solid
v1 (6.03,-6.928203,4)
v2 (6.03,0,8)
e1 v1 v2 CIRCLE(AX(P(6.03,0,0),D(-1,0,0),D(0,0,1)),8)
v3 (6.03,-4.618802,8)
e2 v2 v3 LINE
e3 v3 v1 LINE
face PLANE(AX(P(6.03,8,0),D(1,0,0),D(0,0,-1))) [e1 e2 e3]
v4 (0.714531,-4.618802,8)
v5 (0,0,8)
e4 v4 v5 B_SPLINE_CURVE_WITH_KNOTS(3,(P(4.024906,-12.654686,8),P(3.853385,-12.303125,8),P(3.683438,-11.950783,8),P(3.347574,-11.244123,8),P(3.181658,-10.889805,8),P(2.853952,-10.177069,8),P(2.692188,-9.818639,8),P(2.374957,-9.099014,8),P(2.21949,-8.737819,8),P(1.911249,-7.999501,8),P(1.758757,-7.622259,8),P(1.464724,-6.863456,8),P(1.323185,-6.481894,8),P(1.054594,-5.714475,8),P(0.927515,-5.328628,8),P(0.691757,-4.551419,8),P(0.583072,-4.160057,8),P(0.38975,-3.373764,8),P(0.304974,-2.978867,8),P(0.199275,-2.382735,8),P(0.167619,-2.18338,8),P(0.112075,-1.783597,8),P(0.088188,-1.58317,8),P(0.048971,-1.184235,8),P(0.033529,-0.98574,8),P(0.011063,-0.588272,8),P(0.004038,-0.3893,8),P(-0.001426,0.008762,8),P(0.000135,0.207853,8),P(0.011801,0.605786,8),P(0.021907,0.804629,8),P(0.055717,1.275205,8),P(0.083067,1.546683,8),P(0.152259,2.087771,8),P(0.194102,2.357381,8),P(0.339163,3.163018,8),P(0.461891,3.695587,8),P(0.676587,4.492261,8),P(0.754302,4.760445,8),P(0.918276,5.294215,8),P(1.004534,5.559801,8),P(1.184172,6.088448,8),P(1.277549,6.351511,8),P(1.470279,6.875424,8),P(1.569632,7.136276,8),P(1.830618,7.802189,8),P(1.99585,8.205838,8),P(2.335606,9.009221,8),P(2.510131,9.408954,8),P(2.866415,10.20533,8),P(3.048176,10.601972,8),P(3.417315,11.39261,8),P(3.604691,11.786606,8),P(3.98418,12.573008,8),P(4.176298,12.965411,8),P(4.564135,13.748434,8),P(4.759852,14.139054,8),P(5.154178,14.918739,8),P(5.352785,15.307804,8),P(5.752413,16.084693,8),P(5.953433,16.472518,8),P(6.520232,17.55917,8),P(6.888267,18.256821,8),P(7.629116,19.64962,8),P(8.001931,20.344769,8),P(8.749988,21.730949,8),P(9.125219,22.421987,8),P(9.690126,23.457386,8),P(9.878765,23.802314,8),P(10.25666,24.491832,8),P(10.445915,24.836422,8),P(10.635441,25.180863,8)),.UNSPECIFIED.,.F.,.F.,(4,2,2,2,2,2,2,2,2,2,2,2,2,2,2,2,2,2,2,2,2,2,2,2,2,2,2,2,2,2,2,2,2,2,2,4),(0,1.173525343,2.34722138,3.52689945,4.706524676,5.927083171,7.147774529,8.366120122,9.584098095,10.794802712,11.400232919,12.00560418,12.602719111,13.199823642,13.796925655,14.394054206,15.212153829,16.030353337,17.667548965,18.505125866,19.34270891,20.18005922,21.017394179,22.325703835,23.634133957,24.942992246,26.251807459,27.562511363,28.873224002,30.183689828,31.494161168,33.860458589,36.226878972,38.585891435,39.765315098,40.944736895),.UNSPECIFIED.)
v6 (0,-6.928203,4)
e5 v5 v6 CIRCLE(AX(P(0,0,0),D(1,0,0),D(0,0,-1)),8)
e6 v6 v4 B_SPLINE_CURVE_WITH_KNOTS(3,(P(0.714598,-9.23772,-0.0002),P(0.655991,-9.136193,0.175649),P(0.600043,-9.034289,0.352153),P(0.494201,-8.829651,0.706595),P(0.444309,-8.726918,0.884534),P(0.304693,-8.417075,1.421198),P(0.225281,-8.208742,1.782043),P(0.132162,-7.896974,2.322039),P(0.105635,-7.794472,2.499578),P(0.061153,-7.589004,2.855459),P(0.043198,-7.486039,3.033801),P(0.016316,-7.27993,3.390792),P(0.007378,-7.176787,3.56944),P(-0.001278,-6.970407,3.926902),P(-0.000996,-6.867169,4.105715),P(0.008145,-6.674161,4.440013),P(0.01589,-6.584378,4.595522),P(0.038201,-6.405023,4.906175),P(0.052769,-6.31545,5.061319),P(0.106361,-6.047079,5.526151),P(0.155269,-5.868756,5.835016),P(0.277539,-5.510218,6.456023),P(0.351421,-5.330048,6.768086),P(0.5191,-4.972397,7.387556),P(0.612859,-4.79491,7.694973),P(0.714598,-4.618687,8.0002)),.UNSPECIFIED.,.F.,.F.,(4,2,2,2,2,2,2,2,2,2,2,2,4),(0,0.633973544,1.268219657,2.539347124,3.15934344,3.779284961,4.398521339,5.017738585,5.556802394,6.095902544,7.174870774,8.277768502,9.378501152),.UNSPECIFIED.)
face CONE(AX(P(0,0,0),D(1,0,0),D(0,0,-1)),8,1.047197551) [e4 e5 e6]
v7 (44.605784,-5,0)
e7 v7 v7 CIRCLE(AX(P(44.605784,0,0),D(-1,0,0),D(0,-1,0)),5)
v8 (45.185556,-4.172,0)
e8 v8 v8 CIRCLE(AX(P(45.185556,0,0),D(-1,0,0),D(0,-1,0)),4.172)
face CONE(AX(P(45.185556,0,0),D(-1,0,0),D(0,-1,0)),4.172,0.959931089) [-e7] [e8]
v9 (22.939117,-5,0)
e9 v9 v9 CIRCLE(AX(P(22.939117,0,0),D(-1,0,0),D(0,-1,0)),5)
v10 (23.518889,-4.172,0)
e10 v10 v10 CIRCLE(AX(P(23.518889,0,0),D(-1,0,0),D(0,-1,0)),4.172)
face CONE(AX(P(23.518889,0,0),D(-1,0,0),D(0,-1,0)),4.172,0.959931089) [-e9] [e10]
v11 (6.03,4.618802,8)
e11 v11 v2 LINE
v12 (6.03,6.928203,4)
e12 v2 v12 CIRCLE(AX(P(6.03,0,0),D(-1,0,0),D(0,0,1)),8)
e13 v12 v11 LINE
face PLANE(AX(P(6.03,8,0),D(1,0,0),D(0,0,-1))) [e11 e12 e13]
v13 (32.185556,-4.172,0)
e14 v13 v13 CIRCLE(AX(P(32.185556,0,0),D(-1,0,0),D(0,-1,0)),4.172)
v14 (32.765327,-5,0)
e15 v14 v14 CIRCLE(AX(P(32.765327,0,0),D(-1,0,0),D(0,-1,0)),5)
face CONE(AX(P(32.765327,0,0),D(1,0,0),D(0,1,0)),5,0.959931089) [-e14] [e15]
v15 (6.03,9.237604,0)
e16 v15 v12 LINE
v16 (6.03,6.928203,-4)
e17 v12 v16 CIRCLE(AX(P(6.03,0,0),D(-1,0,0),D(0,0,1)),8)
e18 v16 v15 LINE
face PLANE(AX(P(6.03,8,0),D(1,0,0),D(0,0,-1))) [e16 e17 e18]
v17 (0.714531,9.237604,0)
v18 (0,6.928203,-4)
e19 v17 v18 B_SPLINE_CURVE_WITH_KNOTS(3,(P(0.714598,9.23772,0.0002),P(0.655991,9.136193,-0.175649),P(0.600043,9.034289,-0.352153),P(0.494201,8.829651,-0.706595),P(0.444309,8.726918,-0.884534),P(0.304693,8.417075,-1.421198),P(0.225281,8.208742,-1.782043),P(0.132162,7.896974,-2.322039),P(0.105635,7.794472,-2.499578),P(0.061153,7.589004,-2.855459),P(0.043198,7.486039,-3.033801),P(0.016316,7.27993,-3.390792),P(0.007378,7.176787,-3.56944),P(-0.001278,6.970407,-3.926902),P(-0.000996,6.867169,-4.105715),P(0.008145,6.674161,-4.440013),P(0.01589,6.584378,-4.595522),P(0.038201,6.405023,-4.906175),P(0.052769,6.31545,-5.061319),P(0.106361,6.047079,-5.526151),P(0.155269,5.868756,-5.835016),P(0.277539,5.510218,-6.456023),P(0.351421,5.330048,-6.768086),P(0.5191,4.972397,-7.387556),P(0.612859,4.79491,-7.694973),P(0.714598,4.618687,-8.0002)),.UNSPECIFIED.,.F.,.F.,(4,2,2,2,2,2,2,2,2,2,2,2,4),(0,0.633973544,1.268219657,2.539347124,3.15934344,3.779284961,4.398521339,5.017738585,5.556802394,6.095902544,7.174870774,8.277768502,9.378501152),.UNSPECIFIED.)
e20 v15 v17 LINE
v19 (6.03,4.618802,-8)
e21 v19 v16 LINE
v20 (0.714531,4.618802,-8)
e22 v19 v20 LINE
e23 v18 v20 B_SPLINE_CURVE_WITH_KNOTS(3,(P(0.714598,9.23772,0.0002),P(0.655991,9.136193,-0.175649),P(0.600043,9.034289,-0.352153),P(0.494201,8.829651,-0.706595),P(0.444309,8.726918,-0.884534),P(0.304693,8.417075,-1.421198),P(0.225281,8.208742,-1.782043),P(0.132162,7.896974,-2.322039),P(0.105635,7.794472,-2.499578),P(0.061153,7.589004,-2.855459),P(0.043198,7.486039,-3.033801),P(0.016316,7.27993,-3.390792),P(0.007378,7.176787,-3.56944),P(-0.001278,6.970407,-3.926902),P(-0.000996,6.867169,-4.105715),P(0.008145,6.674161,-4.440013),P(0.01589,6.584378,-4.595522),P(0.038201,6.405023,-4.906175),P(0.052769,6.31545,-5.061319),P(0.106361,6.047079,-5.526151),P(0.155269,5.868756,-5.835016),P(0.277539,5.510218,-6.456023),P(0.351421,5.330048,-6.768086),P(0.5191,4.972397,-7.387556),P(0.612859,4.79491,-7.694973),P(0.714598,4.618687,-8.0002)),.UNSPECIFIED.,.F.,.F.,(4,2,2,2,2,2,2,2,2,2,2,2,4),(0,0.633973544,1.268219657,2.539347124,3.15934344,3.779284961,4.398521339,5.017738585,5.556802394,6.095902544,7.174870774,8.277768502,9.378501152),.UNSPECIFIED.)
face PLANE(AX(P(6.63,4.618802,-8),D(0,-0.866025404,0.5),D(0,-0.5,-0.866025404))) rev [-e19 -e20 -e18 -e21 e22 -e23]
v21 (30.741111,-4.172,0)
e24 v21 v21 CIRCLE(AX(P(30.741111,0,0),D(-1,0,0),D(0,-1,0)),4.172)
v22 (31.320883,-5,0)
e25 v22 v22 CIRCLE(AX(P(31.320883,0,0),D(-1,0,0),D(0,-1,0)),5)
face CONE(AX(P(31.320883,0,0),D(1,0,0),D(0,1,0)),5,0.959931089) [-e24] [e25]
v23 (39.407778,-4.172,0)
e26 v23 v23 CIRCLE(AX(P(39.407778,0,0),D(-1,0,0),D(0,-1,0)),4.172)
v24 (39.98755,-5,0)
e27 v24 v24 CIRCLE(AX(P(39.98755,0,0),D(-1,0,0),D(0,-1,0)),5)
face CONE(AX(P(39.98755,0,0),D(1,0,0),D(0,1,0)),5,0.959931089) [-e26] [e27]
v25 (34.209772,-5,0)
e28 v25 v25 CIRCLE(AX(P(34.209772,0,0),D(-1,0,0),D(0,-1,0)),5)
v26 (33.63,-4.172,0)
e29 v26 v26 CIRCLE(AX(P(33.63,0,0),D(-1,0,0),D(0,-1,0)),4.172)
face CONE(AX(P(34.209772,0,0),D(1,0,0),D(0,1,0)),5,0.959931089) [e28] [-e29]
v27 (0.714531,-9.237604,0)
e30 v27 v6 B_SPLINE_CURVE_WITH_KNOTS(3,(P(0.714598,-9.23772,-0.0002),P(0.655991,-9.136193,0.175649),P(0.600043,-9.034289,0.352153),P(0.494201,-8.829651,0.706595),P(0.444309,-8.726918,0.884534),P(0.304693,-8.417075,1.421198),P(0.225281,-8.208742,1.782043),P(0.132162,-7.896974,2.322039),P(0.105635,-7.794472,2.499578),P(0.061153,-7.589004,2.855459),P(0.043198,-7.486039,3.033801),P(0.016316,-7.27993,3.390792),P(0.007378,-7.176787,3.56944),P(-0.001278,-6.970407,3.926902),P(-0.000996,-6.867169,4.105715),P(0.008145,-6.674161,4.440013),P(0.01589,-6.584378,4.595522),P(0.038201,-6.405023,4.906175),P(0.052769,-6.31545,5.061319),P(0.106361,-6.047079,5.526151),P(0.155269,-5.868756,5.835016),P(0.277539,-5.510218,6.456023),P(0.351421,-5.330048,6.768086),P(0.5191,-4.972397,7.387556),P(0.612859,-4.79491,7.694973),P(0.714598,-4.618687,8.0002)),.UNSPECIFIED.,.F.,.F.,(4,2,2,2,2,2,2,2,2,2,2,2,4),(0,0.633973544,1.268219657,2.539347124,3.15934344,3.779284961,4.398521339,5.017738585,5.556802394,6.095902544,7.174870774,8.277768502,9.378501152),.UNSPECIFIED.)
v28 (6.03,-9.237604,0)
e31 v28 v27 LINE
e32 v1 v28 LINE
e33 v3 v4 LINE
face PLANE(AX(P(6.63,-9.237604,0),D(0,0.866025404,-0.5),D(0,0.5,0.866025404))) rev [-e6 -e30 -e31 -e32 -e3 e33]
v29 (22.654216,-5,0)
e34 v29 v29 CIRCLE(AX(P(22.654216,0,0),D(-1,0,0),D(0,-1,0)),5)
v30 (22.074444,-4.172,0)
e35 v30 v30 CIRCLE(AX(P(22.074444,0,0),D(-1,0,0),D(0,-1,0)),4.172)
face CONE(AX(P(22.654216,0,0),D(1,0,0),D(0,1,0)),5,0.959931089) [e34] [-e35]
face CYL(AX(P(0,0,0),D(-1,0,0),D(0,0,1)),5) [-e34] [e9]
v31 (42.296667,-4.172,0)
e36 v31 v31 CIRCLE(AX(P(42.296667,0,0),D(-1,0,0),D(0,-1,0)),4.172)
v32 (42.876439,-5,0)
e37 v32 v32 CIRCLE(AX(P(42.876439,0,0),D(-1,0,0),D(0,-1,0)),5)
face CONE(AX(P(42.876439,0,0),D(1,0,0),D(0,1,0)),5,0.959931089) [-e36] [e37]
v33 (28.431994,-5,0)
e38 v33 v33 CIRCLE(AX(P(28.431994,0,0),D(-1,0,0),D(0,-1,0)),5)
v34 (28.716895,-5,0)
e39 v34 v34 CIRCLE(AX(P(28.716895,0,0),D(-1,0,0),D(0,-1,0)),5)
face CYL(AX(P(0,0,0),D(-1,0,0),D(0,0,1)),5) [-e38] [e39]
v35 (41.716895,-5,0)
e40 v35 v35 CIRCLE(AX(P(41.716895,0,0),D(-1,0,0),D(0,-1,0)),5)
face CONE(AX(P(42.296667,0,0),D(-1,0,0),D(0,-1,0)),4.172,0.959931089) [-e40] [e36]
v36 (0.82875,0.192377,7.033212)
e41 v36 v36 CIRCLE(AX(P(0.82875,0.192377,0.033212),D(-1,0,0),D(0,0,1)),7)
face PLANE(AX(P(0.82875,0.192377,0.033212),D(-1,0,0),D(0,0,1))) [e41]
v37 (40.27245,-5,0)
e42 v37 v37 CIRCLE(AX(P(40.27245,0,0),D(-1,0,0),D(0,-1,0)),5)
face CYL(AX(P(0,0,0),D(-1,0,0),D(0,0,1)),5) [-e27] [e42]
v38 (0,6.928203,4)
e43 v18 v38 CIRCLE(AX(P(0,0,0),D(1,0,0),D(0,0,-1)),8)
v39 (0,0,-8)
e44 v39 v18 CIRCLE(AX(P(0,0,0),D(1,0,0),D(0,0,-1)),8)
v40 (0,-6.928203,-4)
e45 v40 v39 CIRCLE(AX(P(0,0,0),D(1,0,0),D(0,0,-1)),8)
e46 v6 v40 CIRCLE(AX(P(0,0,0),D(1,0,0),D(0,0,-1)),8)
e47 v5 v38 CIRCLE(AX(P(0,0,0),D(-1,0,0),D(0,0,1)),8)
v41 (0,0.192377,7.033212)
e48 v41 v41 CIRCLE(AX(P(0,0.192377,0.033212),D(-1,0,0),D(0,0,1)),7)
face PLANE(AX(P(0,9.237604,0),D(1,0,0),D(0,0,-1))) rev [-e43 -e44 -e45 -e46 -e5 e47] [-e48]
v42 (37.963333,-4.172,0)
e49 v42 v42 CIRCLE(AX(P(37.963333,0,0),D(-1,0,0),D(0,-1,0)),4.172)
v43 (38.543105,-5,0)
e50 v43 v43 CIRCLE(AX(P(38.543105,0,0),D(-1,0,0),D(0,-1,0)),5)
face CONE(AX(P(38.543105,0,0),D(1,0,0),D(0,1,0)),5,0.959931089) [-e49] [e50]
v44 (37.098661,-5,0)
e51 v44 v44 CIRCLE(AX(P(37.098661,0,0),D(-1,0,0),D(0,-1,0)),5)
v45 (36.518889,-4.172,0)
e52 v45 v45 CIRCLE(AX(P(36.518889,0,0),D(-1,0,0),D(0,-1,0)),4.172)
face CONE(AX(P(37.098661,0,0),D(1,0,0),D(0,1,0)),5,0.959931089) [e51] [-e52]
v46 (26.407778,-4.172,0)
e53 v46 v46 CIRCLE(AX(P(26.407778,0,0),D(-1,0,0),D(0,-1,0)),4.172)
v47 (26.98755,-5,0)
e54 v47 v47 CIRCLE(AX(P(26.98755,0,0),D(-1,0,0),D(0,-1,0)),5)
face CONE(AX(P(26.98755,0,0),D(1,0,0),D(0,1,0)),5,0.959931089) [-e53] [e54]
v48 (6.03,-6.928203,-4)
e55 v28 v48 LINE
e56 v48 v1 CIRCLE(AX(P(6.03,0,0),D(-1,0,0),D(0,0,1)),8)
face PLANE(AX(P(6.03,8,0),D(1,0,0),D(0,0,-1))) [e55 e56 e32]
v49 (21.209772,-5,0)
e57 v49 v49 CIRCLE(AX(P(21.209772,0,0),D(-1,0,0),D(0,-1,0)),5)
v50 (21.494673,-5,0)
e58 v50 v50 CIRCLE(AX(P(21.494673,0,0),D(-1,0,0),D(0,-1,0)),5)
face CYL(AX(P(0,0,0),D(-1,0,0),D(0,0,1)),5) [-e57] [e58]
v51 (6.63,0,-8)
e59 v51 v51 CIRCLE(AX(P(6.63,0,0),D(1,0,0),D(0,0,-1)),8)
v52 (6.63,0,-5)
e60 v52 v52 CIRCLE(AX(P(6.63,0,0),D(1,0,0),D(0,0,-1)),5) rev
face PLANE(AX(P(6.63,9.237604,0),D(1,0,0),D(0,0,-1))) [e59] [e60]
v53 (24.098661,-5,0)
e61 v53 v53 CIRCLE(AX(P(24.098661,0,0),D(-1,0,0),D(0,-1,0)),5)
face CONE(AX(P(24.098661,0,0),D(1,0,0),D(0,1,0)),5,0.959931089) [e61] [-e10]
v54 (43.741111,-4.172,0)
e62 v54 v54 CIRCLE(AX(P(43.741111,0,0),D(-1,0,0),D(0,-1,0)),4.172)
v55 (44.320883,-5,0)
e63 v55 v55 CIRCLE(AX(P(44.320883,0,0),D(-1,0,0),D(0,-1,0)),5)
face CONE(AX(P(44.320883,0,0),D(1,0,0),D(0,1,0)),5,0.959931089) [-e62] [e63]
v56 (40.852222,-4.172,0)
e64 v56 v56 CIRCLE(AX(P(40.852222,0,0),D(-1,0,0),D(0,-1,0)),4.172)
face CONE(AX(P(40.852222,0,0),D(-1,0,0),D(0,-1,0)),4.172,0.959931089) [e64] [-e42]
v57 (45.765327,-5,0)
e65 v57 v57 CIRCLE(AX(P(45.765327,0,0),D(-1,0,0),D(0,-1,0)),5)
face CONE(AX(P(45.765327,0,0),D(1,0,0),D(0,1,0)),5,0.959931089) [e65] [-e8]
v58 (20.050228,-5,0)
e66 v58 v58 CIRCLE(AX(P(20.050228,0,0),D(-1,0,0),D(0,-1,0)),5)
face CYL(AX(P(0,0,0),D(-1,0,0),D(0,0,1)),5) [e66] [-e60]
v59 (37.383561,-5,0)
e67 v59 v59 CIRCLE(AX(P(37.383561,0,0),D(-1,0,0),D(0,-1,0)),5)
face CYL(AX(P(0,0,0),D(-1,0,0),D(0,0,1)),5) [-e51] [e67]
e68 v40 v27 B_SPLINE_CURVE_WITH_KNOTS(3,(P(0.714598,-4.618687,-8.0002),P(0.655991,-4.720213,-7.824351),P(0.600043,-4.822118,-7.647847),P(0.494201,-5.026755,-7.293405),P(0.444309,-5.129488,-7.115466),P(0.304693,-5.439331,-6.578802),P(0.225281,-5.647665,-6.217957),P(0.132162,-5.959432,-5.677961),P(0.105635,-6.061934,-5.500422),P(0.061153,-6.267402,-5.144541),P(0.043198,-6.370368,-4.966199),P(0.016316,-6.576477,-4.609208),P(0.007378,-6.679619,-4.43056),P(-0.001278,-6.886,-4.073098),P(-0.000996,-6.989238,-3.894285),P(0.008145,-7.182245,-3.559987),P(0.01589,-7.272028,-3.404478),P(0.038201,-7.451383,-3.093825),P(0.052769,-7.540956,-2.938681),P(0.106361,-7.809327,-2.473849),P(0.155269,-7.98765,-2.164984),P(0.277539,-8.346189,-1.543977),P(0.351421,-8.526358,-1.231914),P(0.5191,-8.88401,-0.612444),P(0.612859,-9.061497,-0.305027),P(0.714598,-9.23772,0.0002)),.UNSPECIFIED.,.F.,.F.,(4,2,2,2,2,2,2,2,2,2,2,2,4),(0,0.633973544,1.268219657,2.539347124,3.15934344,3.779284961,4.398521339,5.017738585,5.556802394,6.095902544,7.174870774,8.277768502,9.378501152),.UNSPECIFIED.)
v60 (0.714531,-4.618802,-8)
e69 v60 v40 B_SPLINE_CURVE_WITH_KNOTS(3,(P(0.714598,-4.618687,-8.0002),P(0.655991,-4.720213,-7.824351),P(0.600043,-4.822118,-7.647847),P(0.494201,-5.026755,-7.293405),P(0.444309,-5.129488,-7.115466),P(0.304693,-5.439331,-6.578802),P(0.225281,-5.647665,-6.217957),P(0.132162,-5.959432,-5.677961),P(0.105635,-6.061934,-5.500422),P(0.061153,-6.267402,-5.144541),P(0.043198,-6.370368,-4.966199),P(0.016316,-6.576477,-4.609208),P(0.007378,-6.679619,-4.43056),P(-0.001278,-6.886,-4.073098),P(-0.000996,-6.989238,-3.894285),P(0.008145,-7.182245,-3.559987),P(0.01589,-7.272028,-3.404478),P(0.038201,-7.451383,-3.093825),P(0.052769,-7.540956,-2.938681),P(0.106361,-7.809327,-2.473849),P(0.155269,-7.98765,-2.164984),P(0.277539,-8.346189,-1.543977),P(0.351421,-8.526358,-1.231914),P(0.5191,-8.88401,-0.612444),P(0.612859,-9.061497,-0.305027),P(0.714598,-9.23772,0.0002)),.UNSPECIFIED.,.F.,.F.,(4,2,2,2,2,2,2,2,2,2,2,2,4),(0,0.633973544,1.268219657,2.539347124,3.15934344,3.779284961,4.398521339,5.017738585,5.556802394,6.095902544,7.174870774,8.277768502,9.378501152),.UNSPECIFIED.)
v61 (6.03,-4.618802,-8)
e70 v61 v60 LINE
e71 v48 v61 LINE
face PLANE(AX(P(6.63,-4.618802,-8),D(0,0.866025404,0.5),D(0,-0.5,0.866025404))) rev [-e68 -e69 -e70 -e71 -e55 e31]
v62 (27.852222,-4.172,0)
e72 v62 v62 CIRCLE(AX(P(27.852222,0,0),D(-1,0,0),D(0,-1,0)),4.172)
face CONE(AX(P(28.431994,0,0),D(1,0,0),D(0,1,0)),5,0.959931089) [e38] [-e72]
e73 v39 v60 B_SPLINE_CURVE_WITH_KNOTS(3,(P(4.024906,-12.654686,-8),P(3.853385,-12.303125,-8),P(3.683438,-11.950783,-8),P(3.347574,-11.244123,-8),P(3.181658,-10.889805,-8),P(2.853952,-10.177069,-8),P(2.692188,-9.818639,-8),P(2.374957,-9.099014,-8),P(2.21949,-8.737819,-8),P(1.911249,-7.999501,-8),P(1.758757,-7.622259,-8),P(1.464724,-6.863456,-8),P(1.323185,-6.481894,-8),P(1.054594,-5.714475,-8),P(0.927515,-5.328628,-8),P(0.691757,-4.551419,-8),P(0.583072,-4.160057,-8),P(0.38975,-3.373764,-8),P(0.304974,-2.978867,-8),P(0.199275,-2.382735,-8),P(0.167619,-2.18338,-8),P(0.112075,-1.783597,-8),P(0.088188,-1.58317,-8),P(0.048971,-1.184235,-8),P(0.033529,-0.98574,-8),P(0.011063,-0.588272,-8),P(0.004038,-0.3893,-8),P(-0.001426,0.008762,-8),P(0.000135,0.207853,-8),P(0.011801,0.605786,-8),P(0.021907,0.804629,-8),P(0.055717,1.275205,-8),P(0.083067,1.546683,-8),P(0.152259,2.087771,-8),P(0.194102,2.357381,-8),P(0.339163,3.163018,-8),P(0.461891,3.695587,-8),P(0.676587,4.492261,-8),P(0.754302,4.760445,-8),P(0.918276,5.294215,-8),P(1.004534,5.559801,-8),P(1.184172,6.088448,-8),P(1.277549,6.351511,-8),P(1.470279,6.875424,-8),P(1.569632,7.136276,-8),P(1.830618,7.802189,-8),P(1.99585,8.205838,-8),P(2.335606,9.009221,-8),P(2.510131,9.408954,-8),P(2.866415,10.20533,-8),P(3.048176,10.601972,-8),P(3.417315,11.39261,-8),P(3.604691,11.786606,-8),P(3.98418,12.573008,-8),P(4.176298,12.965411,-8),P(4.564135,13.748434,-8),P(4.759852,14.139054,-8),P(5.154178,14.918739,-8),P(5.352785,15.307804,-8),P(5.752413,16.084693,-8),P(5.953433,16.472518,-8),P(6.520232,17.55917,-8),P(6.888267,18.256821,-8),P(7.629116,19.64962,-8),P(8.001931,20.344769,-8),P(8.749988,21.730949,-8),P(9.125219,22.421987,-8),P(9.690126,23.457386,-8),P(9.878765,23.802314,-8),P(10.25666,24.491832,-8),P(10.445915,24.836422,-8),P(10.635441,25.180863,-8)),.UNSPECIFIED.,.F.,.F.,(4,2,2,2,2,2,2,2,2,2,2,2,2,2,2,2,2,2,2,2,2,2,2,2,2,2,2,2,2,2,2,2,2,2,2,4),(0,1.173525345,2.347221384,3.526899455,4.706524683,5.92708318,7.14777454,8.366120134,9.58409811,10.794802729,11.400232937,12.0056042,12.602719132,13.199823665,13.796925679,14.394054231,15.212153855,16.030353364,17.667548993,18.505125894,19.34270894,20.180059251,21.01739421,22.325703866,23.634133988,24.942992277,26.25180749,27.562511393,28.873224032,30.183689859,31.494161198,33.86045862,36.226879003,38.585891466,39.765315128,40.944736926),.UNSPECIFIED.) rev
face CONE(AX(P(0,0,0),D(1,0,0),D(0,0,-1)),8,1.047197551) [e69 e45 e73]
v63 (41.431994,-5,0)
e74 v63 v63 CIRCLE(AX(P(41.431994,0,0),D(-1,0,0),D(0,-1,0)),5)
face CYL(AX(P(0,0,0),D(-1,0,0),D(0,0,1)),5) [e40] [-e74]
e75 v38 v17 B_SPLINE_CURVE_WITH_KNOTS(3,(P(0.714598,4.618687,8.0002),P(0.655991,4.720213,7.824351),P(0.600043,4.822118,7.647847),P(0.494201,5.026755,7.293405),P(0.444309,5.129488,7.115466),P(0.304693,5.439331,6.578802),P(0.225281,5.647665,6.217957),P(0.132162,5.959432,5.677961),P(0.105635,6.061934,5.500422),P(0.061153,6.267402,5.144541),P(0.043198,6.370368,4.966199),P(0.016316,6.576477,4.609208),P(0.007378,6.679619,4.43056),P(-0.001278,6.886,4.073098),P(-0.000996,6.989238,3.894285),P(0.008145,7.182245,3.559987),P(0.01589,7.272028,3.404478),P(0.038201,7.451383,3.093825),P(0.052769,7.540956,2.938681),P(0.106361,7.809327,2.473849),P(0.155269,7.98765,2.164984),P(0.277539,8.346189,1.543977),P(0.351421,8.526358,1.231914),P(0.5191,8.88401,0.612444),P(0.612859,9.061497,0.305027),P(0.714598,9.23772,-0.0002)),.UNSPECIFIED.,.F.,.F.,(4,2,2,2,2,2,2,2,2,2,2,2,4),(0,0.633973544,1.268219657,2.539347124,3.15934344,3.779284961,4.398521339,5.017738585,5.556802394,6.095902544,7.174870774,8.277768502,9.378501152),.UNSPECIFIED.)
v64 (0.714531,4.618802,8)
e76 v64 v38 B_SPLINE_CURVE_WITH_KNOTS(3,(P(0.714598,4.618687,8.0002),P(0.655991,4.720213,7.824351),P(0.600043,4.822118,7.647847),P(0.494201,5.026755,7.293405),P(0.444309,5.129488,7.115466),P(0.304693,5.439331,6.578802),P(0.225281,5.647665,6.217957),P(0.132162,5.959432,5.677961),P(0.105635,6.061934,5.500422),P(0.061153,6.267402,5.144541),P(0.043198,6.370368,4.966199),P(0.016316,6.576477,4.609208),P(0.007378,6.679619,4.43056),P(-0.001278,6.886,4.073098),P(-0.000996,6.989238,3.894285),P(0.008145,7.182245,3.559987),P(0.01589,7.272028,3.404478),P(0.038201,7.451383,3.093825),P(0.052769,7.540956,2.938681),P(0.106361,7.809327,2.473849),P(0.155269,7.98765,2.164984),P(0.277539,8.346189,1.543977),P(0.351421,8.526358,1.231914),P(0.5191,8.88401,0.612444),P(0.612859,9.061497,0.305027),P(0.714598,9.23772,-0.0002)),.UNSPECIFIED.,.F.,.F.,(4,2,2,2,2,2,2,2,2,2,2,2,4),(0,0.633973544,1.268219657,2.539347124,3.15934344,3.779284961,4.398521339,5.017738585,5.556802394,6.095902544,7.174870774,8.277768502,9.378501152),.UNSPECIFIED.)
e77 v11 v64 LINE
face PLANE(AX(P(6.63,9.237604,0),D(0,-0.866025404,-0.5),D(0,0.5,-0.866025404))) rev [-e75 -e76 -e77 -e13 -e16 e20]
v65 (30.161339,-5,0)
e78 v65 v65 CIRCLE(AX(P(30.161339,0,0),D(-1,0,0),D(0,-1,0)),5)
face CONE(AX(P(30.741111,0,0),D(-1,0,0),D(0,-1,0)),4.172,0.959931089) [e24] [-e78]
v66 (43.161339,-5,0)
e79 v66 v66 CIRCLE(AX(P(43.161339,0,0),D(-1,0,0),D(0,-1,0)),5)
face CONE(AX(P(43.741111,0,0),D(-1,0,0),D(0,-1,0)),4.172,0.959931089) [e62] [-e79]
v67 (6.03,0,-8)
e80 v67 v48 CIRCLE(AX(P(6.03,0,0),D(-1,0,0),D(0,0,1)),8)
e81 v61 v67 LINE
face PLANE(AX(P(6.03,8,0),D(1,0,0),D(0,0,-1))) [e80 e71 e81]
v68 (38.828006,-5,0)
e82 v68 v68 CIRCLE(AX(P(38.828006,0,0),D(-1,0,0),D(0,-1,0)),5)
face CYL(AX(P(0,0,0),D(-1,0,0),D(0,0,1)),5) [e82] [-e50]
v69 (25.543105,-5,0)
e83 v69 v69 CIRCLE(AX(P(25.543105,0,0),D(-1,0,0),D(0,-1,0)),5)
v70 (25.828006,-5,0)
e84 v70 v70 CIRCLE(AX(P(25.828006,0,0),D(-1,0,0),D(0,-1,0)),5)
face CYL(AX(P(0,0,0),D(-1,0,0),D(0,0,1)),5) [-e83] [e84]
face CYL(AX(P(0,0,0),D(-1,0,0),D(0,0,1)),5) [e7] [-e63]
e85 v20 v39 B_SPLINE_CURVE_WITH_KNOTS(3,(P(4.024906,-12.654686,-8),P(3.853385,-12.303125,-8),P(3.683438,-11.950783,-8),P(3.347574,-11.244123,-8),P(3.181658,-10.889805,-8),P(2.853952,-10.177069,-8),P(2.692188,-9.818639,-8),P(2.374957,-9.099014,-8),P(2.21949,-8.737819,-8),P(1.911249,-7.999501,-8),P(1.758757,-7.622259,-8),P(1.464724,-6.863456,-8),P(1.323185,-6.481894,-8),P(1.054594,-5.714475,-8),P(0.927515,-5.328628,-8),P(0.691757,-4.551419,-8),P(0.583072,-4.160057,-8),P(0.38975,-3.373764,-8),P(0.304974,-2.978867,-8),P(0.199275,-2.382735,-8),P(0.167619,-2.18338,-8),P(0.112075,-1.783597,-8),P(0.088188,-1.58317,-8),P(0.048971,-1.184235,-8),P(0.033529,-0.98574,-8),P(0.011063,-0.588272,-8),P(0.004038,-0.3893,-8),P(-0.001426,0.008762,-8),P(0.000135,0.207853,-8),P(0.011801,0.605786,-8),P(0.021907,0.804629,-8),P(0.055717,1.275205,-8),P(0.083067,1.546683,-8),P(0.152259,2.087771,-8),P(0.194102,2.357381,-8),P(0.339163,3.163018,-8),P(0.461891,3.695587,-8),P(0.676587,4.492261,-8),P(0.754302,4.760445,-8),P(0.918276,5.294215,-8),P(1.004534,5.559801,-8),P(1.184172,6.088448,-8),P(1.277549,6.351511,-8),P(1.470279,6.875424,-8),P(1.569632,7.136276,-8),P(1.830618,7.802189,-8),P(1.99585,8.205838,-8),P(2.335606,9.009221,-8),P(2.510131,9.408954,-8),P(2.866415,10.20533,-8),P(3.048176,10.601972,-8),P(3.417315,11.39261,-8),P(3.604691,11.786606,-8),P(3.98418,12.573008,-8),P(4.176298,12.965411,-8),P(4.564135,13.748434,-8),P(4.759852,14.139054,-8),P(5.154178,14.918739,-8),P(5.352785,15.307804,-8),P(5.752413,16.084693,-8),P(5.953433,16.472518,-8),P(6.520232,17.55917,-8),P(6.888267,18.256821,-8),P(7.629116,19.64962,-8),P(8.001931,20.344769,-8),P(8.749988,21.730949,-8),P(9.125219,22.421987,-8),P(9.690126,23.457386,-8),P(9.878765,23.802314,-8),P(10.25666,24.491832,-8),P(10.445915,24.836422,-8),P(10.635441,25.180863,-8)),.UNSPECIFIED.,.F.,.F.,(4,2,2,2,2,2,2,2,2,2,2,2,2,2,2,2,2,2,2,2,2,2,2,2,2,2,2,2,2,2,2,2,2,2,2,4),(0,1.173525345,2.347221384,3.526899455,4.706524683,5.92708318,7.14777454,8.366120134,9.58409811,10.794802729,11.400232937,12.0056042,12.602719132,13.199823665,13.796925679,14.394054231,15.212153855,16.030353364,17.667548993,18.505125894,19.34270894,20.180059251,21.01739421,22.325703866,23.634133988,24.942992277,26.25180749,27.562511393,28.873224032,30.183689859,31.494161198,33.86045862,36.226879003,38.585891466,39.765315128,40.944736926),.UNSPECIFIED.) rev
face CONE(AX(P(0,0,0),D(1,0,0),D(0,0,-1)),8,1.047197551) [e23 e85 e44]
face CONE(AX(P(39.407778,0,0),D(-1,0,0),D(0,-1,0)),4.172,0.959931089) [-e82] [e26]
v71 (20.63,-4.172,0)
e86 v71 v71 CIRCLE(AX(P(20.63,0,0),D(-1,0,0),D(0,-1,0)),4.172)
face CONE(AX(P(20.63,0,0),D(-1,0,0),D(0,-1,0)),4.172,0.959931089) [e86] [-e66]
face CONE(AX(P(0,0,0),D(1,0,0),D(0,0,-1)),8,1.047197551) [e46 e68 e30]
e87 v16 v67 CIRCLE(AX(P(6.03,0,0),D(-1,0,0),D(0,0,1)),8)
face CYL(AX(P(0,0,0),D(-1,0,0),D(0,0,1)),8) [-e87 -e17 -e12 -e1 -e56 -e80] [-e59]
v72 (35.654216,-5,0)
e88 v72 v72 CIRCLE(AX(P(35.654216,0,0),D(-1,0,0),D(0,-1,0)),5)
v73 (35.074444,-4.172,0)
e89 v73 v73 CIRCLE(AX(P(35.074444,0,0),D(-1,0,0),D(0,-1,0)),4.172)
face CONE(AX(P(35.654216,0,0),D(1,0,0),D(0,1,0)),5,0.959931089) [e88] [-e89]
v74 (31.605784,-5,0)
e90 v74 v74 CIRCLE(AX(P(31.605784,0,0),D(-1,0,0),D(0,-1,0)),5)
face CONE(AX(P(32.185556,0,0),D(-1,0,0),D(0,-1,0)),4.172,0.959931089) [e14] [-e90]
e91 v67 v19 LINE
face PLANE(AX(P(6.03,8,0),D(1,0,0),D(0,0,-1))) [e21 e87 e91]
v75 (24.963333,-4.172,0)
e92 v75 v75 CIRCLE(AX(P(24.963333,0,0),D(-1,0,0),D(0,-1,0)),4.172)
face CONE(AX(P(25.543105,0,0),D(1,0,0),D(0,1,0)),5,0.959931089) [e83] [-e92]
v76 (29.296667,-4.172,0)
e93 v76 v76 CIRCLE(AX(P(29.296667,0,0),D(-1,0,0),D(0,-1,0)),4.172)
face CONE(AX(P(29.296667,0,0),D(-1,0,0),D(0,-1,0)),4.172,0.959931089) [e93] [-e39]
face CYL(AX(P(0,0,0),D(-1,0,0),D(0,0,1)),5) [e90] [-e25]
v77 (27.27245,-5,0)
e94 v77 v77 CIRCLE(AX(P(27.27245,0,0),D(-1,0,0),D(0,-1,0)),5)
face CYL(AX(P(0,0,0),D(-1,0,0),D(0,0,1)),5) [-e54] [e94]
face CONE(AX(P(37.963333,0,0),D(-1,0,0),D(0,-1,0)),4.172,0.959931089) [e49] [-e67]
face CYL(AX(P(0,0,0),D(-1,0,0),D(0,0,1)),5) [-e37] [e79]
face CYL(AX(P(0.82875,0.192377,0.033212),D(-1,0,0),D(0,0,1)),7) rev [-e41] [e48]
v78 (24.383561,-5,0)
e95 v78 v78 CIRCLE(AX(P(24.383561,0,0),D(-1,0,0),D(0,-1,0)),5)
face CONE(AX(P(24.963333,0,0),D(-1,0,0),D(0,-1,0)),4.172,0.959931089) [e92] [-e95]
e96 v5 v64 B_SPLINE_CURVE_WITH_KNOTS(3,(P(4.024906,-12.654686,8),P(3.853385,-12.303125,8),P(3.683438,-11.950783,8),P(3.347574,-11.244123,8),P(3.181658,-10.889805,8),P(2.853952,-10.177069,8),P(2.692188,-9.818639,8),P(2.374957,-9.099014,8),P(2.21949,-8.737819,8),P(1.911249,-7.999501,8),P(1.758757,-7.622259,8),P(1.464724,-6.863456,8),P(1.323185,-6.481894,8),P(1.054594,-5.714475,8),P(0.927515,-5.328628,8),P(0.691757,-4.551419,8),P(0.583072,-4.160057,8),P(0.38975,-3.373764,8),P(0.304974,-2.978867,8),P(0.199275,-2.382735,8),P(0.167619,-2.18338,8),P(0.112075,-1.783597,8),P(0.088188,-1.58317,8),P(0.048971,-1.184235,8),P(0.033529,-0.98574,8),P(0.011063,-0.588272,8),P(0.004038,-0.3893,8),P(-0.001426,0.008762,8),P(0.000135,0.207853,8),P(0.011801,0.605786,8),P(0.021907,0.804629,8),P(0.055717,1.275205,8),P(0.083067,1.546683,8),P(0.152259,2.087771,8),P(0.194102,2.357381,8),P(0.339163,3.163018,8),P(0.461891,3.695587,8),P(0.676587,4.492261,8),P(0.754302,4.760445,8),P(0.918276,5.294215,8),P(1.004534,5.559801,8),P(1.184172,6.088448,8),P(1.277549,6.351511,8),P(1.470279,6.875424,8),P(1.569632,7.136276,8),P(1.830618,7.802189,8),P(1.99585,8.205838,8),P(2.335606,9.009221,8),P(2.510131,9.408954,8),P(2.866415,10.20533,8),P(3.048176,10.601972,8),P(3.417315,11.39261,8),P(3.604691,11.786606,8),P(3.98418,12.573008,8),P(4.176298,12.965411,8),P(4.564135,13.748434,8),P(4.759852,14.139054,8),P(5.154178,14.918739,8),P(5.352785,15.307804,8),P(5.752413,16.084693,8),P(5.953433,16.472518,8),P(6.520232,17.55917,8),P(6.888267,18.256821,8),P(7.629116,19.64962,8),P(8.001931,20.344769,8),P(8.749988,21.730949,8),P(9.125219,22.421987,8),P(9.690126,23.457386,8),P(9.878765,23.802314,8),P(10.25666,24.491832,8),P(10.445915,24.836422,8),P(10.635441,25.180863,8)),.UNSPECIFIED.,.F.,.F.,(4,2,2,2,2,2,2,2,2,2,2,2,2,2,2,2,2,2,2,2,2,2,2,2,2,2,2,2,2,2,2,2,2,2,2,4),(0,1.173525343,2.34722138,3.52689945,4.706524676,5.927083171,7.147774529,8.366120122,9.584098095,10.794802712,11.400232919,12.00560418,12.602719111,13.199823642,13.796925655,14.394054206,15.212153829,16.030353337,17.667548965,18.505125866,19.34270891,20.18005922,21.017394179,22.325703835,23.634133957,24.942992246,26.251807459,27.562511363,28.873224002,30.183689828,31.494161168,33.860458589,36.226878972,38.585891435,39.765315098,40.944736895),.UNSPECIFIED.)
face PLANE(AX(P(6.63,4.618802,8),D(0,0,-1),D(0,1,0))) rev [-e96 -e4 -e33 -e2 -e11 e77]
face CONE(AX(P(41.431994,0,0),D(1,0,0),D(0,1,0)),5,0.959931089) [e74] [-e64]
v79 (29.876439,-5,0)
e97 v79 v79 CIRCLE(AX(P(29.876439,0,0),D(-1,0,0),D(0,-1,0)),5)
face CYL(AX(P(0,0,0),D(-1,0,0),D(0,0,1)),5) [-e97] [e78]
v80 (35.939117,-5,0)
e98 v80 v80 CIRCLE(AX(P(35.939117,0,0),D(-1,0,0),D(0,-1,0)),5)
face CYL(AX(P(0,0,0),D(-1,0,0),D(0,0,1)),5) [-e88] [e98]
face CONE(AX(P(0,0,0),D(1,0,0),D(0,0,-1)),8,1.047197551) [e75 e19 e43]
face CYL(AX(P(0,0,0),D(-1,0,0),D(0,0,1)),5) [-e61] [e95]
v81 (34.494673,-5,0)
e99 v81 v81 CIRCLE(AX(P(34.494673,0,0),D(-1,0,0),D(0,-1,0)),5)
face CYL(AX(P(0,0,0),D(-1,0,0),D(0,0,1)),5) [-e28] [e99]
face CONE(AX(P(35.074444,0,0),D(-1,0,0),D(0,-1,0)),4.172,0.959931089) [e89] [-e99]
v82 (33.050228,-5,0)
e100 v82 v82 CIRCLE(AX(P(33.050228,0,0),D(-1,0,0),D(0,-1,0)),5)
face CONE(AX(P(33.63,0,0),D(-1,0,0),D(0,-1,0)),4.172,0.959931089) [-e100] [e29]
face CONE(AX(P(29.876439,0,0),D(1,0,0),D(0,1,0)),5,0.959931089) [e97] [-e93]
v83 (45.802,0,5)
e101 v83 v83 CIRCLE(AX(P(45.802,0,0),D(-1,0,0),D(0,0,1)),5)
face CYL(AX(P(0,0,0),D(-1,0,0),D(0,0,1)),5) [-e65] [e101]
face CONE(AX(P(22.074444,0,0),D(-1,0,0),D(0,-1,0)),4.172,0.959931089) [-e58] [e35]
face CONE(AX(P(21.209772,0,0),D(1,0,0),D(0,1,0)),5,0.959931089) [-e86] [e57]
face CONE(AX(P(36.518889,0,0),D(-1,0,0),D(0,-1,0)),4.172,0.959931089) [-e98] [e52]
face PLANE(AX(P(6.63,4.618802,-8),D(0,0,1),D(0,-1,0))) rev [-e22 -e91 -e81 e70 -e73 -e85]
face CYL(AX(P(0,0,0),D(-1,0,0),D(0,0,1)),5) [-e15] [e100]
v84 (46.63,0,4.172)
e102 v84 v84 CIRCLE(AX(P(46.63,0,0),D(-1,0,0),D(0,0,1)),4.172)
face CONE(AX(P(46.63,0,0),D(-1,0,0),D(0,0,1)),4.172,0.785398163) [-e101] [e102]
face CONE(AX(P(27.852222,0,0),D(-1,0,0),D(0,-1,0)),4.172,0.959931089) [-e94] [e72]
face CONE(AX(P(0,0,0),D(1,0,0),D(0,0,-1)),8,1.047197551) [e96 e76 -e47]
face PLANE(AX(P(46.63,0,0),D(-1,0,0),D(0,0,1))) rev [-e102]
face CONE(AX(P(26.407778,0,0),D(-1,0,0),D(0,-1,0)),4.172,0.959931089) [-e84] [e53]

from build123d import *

# Parameters (mm, degrees)
BASEHEAD_DEPTH     = 6.63
INDENT_START       = -0.82875
INDENT_2_OUTLINE_R = 7
INDENT_2_DEPTH     = 0.82875
SKETCH4_W          = 0.6
SKETCH4_H          = 11.237604307
THDSCHPAT_COUNT    = 18
THDSCHPAT_PITCH    = 1.444444444


# Read off the part's stored shape, not the designer's step: Indent
with BuildPart() as part:
    # Sketch1 → BaseHead (new body)
    with BuildSketch(Plane(origin=(0, 0, 0), x_dir=(0, 0, -1), z_dir=(1, 0, 0))):
        Polygon((8, 4.618802154), (8, -4.618802154), (0, -9.237604307), (-8, -4.618802154), (-8, 4.618802154), (0, 9.237604307), align=None)
    extrude(amount=BASEHEAD_DEPTH)

    # Indent outline → Indent (revolve)
    with BuildSketch(Plane.YX):
        Polygon((5, 6.63), (5, 45.802), (4.172, 46.63), (0, 46.63), (0, 6.63), align=None)
    revolve(axis=Axis((0, 0, 0), (1, 0, 0)))

    # Indent 2 outline → Indent 2 (cut)
    with BuildSketch(Plane.ZY.offset(INDENT_START)):
        with Locations((0.033212245, 0.192376607)):
            Circle(INDENT_2_OUTLINE_R)
    extrude(amount=INDENT_2_DEPTH, mode=Mode.SUBTRACT)

    # Sketch3 → HeadChamfer (revolve, cut)
    with BuildSketch(Plane.XY, mode=Mode.PRIVATE) as headchamfer_sk:
        Polygon((0, 8), (3.601282526, 14.237604307), (3.601282526, 19.237604307), (-10, 19.237604307), (-10, 8), align=None)
    revolve(headchamfer_sk.sketch.rotate(Axis((0, 0, 0), (1, 0, 0)), 90), axis=Axis((0, 0, 0), (1, 0, 0)), mode=Mode.SUBTRACT)

    # Sketch4 → BearingFace (revolve, cut)
    with BuildSketch(Plane.XY, mode=Mode.PRIVATE) as bearingface_sk:
        with Locations((6.33, 13.618802154)):
            Rectangle(SKETCH4_W, SKETCH4_H)
    revolve(bearingface_sk.sketch.rotate(Axis((0, 0, 0), (1, 0, 0)), 90), axis=Axis((0, 0, 0), (1, 0, 0)), mode=Mode.SUBTRACT)

    # ThdSchSke → ThreadSchematic (revolve, cut)
    with BuildSketch(Plane.XY):
        Polygon((20.63, -4.172), (20.050228158, -5), (20.050228158, -6.25), (21.209771842, -6.25), (21.209771842, -5), align=None)
    threadschematic = revolve(axis=Axis((-3.175, 0, 0), (1, 0, 0)), mode=Mode.SUBTRACT)

    # ThdSchPat: ThreadSchematic ×18
    with Locations(*[(i * THDSCHPAT_PITCH, 0, 0) for i in range(1, THDSCHPAT_COUNT)]):
        add(threadschematic, mode=Mode.SUBTRACT)


solid = part.part
